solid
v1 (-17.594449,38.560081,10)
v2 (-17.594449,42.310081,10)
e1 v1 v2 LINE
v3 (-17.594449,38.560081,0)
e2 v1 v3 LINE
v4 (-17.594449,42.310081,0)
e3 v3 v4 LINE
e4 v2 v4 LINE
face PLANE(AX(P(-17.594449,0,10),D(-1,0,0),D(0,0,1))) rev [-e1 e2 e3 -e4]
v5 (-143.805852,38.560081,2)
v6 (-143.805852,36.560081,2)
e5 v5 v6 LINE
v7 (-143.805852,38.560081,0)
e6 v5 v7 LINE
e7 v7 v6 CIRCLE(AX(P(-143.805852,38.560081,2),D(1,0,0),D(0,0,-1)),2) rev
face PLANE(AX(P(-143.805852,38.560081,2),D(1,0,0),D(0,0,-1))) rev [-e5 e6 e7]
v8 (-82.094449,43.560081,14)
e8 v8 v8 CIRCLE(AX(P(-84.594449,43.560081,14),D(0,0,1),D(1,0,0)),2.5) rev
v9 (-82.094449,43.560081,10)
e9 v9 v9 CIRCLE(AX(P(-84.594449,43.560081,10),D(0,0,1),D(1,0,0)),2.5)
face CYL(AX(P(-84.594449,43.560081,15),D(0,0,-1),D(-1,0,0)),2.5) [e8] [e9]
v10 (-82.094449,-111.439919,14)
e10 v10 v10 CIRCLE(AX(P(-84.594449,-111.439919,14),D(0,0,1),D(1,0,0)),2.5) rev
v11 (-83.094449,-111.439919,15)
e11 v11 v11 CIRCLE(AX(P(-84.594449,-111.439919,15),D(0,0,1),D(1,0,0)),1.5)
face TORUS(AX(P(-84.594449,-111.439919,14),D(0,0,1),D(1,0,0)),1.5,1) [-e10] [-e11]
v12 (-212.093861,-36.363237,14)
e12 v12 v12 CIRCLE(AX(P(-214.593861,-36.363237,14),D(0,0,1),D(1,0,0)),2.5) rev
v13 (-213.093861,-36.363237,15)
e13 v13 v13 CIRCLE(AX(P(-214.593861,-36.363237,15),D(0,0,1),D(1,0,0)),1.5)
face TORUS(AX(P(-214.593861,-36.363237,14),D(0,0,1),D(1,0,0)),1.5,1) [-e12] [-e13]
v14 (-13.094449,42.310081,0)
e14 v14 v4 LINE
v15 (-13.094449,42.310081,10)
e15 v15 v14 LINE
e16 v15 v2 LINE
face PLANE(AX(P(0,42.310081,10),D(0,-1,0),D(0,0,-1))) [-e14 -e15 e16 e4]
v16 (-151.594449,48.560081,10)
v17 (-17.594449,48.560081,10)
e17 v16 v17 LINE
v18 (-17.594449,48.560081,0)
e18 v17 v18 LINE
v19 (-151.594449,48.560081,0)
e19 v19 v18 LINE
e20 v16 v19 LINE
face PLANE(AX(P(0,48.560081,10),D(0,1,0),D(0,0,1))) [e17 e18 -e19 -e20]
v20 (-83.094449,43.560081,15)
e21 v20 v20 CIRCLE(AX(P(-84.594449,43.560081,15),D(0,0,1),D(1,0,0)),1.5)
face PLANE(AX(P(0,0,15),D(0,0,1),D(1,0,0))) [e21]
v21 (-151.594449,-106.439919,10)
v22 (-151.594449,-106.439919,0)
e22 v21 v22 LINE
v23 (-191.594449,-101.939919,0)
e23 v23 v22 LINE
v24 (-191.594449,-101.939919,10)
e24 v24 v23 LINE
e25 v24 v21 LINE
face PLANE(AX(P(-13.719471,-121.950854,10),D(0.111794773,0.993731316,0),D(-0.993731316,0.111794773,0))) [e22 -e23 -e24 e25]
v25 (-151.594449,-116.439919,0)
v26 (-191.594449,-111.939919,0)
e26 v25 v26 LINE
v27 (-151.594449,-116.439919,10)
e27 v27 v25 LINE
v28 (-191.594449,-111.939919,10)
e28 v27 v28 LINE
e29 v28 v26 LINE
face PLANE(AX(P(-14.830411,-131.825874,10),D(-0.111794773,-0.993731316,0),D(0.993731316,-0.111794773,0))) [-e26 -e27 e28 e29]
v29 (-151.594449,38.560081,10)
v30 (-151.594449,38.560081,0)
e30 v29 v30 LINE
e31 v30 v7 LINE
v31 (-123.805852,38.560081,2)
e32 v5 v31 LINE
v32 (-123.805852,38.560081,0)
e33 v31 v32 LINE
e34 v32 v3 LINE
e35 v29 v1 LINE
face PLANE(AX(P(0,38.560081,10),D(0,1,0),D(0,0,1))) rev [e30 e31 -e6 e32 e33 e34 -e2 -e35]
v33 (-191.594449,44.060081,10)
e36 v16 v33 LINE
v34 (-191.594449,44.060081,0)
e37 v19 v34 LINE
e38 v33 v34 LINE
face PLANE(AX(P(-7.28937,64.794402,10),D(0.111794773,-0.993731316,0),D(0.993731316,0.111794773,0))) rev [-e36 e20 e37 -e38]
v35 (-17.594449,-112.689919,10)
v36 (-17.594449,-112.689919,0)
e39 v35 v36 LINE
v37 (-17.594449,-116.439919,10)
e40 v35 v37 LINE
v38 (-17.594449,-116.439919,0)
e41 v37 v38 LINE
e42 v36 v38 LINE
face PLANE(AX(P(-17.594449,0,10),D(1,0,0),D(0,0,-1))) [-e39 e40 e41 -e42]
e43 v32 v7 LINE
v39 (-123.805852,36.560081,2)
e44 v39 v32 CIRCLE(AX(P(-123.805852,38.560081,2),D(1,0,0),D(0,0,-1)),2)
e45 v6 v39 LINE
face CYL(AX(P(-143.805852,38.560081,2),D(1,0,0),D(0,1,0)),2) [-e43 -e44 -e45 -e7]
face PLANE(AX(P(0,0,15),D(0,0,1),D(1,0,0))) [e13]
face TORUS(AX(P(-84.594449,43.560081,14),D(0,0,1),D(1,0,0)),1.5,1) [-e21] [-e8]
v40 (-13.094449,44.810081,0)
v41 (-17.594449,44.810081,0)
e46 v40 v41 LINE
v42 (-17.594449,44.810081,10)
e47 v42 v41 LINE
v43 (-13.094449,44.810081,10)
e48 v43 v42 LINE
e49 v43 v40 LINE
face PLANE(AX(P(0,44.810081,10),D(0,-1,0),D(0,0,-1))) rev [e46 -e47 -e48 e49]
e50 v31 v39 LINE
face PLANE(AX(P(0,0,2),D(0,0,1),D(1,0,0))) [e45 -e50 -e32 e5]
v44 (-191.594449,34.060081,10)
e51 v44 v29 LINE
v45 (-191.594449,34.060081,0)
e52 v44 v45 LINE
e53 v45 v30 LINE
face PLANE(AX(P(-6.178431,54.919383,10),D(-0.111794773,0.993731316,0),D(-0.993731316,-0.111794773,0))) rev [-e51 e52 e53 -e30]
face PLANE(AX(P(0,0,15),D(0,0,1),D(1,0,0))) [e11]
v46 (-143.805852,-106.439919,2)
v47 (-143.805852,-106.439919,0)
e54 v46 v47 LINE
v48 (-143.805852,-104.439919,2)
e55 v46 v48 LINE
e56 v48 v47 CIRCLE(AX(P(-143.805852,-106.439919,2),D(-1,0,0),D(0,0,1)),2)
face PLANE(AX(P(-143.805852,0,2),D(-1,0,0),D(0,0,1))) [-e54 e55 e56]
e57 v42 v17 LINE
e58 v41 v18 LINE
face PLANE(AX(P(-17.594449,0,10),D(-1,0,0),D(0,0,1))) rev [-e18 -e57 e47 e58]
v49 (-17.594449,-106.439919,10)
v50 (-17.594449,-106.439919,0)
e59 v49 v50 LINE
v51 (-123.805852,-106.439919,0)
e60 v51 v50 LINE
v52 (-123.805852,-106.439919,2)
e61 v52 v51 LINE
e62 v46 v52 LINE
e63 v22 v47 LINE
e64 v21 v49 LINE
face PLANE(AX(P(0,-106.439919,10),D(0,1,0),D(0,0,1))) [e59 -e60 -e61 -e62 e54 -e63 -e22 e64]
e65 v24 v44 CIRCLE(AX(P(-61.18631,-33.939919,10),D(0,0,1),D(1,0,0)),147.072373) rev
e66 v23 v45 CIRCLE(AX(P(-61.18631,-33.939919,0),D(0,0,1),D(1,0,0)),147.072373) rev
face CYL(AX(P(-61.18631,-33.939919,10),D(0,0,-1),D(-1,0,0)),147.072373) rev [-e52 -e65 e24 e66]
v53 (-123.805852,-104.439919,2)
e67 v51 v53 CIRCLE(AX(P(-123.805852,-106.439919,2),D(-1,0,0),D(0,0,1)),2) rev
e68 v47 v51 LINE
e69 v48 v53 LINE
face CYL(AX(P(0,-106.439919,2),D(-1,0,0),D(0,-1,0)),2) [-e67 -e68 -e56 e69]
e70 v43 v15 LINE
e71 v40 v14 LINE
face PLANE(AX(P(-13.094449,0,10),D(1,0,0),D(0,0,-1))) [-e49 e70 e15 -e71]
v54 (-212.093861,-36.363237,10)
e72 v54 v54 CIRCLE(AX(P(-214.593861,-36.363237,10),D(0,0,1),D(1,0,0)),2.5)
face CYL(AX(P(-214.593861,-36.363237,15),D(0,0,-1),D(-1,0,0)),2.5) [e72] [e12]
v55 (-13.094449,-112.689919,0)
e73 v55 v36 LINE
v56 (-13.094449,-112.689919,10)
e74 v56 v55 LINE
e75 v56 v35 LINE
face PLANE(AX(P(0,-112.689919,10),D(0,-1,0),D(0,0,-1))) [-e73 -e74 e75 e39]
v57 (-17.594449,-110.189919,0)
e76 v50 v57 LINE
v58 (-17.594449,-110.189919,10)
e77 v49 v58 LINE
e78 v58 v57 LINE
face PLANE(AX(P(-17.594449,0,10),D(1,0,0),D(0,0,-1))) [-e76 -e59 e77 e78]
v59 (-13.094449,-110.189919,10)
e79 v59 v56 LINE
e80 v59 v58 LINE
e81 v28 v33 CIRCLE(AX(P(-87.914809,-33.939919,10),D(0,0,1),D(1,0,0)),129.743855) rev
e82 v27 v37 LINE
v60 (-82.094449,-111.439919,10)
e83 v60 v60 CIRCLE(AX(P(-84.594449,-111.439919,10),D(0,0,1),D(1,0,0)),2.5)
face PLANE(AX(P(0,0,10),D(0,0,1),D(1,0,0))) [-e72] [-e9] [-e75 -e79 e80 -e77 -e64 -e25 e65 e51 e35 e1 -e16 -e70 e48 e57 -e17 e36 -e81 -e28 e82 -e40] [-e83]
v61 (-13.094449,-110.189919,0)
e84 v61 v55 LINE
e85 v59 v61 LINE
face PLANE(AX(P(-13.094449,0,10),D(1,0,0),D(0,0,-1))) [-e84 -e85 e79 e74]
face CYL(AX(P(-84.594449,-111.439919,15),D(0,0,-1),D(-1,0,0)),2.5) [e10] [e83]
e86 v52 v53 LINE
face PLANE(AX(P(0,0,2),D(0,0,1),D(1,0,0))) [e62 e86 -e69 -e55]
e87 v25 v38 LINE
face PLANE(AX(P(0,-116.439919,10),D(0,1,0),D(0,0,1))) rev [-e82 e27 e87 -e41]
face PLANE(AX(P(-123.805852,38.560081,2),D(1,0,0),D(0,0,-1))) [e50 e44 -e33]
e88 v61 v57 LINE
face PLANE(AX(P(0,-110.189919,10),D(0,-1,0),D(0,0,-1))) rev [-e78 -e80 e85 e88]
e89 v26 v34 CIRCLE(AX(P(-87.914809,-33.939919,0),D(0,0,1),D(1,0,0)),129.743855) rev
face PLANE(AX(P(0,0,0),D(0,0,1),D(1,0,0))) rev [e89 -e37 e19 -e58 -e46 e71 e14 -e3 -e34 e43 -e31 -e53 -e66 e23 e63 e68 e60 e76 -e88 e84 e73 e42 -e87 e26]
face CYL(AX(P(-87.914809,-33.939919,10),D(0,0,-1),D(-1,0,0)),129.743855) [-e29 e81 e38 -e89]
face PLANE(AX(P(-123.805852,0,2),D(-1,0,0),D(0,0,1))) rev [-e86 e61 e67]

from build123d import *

# Parameters (mm, degrees)
ESQUISSE1_R        = 2.5
ESQUISSE1_W        = 134
ESQUISSE1_H        = 10
BOSS_EXTRU_2_DEPTH = 10
ESQUISSE1_26_W     = 20
ESQUISSE1_26_H     = 2
BOSS_EXTRU_3_DEPTH = 2
ESQUISSE1_27_R     = 2.5
BOSS_EXTRU_4_DEPTH = 15
ESQUISSE1_28_W     = 4.5
ESQUISSE1_28_H     = 2.5
BOSS_EXTRU_5_DEPTH = 10
CONG_1_R           = 1
CONG_2_R           = 1
CONG_3_R           = 1
CONG_4_R           = 2
CONG_5_R           = 2


with BuildPart() as part:
    # Esquisse1 → Boss.-Extru.2 (new body)
    # profile 1 of 7: a face of its own
    with BuildSketch(Plane.XY):
        Polygon((-151.59444934, 48.560080763), (-151.59444934, 38.560080763), (-143.805852374, 38.560080763), (-123.805852374, 38.560080763), (-17.59444934, 38.560080763), (-17.59444934, 42.310080763), (-17.59444934, 44.810080763), (-17.59444934, 48.560080763), align=None)
        with Locations((-84.59444934, 43.560080763)):
            Circle(ESQUISSE1_R, mode=Mode.SUBTRACT)
    # profile 2 of 7: a face of its own
    with BuildSketch(Plane.XY):
        Polygon((-191.59444934, 38.560080763), (-151.59444934, 38.560080763), (-151.59444934, 48.560080763), (-191.59444934, 44.060080763), align=None)
    # profile 3 of 7: a face of its own
    with BuildSketch(Plane.XY):
        with BuildLine():
            ThreePointArc((-191.59444934, -101.939919237), (-208.258682651, -33.939919237), (-191.59444934, 34.060080763))
            Line((-191.59444934, 34.060080763), (-191.59444934, 38.560080763))
            Line((-191.59444934, 38.560080763), (-191.59444934, 44.060080763))
            ThreePointArc((-191.59444934, 44.060080763), (-217.658663565, -33.939919237), (-191.59444934, -111.939919237))
            Line((-191.59444934, -111.939919237), (-191.59444934, -106.439919237))
            Line((-191.59444934, -106.439919237), (-191.59444934, -101.939919237))
        make_face()
        with Locations((-214.593861295, -36.363237388)):
            Circle(ESQUISSE1_R, mode=Mode.SUBTRACT)
    # profile 4 of 7: a face of its own
    with BuildSketch(Plane.XY):
        Polygon((-191.59444934, 38.560080763), (-191.59444934, 34.060080763), (-151.59444934, 38.560080763), align=None)
    # profile 5 of 7: a face of its own
    with BuildSketch(Plane.XY):
        Polygon((-191.59444934, -111.939919237), (-191.59444934, -106.439919237), (-151.59444934, -106.439919237), (-151.59444934, -116.439919237), align=None)
    # profile 6 of 7: a face of its own
    with BuildSketch(Plane.XY):
        Polygon((-151.59444934, -106.439919237), (-191.59444934, -101.939919237), (-191.59444934, -106.439919237), align=None)
    # profile 7 of 7: a face of its own
    with BuildSketch(Plane.XY):
        with Locations((-84.59444934, -111.439919237)):
            Rectangle(ESQUISSE1_W, ESQUISSE1_H)
        with Locations((-84.59444934, -111.439919237)):
            Circle(ESQUISSE1_R, mode=Mode.SUBTRACT)
    extrude(amount=BOSS_EXTRU_2_DEPTH)

    # Esquisse1<26> → Boss.-Extru.3 (add)
    with BuildSketch(Plane.XY):
        with Locations((-133.805852374, -105.439919237)):
            Rectangle(ESQUISSE1_26_W, ESQUISSE1_26_H)
        with Locations((-133.805852374, 37.560080763)):
            Rectangle(ESQUISSE1_26_W, ESQUISSE1_26_H)
    extrude(amount=BOSS_EXTRU_3_DEPTH)

    # Esquisse1<27> → Boss.-Extru.4 (add)
    with BuildSketch(Plane.XY):
        with Locations((-214.593861295, -36.363237388)):
            Circle(ESQUISSE1_27_R)
        with Locations((-84.59444934, 43.560080763)):
            Circle(ESQUISSE1_27_R)
        with Locations((-84.59444934, -111.439919237)):
            Circle(ESQUISSE1_27_R)
    extrude(amount=BOSS_EXTRU_4_DEPTH)

    # Esquisse1<28> → Boss.-Extru.5 (add)
    with BuildSketch(Plane.XY):
        with Locations((-15.34444934, 43.560080763)):
            Rectangle(ESQUISSE1_28_W, ESQUISSE1_28_H)
        with Locations((-15.34444934, -111.439919237)):
            Rectangle(ESQUISSE1_28_W, ESQUISSE1_28_H)
    extrude(amount=BOSS_EXTRU_5_DEPTH)

    # Congé1
    cong_1_edges = [part.edges().sort_by_distance(p)[0] for p in [
        (-87.09444934, 43.560080763, 15),
    ]]
    fillet(cong_1_edges, radius=CONG_1_R)

    # Congé2
    cong_2_edges = [part.edges().sort_by_distance(p)[0] for p in [
        (-87.09444934, -111.439919237, 15),
    ]]
    fillet(cong_2_edges, radius=CONG_2_R)

    # Congé3
    cong_3_edges = [part.edges().sort_by_distance(p)[0] for p in [
        (-217.093861295, -36.363237388, 15),
    ]]
    fillet(cong_3_edges, radius=CONG_3_R)

    # Congé4
    cong_4_edges = [part.edges().sort_by_distance(p)[0] for p in [
        (-133.805852374, -104.439919237, 0),
    ]]
    fillet(cong_4_edges, radius=CONG_4_R - 0.0001)  # a hair under: the kernel refuses the full size

    # Congé5
    cong_5_edges = [part.edges().sort_by_distance(p)[0] for p in [
        (-133.805852374, 36.560080763, 0),
    ]]
    fillet(cong_5_edges, radius=CONG_5_R - 0.0001)  # a hair under: the kernel refuses the full size


solid = part.part
